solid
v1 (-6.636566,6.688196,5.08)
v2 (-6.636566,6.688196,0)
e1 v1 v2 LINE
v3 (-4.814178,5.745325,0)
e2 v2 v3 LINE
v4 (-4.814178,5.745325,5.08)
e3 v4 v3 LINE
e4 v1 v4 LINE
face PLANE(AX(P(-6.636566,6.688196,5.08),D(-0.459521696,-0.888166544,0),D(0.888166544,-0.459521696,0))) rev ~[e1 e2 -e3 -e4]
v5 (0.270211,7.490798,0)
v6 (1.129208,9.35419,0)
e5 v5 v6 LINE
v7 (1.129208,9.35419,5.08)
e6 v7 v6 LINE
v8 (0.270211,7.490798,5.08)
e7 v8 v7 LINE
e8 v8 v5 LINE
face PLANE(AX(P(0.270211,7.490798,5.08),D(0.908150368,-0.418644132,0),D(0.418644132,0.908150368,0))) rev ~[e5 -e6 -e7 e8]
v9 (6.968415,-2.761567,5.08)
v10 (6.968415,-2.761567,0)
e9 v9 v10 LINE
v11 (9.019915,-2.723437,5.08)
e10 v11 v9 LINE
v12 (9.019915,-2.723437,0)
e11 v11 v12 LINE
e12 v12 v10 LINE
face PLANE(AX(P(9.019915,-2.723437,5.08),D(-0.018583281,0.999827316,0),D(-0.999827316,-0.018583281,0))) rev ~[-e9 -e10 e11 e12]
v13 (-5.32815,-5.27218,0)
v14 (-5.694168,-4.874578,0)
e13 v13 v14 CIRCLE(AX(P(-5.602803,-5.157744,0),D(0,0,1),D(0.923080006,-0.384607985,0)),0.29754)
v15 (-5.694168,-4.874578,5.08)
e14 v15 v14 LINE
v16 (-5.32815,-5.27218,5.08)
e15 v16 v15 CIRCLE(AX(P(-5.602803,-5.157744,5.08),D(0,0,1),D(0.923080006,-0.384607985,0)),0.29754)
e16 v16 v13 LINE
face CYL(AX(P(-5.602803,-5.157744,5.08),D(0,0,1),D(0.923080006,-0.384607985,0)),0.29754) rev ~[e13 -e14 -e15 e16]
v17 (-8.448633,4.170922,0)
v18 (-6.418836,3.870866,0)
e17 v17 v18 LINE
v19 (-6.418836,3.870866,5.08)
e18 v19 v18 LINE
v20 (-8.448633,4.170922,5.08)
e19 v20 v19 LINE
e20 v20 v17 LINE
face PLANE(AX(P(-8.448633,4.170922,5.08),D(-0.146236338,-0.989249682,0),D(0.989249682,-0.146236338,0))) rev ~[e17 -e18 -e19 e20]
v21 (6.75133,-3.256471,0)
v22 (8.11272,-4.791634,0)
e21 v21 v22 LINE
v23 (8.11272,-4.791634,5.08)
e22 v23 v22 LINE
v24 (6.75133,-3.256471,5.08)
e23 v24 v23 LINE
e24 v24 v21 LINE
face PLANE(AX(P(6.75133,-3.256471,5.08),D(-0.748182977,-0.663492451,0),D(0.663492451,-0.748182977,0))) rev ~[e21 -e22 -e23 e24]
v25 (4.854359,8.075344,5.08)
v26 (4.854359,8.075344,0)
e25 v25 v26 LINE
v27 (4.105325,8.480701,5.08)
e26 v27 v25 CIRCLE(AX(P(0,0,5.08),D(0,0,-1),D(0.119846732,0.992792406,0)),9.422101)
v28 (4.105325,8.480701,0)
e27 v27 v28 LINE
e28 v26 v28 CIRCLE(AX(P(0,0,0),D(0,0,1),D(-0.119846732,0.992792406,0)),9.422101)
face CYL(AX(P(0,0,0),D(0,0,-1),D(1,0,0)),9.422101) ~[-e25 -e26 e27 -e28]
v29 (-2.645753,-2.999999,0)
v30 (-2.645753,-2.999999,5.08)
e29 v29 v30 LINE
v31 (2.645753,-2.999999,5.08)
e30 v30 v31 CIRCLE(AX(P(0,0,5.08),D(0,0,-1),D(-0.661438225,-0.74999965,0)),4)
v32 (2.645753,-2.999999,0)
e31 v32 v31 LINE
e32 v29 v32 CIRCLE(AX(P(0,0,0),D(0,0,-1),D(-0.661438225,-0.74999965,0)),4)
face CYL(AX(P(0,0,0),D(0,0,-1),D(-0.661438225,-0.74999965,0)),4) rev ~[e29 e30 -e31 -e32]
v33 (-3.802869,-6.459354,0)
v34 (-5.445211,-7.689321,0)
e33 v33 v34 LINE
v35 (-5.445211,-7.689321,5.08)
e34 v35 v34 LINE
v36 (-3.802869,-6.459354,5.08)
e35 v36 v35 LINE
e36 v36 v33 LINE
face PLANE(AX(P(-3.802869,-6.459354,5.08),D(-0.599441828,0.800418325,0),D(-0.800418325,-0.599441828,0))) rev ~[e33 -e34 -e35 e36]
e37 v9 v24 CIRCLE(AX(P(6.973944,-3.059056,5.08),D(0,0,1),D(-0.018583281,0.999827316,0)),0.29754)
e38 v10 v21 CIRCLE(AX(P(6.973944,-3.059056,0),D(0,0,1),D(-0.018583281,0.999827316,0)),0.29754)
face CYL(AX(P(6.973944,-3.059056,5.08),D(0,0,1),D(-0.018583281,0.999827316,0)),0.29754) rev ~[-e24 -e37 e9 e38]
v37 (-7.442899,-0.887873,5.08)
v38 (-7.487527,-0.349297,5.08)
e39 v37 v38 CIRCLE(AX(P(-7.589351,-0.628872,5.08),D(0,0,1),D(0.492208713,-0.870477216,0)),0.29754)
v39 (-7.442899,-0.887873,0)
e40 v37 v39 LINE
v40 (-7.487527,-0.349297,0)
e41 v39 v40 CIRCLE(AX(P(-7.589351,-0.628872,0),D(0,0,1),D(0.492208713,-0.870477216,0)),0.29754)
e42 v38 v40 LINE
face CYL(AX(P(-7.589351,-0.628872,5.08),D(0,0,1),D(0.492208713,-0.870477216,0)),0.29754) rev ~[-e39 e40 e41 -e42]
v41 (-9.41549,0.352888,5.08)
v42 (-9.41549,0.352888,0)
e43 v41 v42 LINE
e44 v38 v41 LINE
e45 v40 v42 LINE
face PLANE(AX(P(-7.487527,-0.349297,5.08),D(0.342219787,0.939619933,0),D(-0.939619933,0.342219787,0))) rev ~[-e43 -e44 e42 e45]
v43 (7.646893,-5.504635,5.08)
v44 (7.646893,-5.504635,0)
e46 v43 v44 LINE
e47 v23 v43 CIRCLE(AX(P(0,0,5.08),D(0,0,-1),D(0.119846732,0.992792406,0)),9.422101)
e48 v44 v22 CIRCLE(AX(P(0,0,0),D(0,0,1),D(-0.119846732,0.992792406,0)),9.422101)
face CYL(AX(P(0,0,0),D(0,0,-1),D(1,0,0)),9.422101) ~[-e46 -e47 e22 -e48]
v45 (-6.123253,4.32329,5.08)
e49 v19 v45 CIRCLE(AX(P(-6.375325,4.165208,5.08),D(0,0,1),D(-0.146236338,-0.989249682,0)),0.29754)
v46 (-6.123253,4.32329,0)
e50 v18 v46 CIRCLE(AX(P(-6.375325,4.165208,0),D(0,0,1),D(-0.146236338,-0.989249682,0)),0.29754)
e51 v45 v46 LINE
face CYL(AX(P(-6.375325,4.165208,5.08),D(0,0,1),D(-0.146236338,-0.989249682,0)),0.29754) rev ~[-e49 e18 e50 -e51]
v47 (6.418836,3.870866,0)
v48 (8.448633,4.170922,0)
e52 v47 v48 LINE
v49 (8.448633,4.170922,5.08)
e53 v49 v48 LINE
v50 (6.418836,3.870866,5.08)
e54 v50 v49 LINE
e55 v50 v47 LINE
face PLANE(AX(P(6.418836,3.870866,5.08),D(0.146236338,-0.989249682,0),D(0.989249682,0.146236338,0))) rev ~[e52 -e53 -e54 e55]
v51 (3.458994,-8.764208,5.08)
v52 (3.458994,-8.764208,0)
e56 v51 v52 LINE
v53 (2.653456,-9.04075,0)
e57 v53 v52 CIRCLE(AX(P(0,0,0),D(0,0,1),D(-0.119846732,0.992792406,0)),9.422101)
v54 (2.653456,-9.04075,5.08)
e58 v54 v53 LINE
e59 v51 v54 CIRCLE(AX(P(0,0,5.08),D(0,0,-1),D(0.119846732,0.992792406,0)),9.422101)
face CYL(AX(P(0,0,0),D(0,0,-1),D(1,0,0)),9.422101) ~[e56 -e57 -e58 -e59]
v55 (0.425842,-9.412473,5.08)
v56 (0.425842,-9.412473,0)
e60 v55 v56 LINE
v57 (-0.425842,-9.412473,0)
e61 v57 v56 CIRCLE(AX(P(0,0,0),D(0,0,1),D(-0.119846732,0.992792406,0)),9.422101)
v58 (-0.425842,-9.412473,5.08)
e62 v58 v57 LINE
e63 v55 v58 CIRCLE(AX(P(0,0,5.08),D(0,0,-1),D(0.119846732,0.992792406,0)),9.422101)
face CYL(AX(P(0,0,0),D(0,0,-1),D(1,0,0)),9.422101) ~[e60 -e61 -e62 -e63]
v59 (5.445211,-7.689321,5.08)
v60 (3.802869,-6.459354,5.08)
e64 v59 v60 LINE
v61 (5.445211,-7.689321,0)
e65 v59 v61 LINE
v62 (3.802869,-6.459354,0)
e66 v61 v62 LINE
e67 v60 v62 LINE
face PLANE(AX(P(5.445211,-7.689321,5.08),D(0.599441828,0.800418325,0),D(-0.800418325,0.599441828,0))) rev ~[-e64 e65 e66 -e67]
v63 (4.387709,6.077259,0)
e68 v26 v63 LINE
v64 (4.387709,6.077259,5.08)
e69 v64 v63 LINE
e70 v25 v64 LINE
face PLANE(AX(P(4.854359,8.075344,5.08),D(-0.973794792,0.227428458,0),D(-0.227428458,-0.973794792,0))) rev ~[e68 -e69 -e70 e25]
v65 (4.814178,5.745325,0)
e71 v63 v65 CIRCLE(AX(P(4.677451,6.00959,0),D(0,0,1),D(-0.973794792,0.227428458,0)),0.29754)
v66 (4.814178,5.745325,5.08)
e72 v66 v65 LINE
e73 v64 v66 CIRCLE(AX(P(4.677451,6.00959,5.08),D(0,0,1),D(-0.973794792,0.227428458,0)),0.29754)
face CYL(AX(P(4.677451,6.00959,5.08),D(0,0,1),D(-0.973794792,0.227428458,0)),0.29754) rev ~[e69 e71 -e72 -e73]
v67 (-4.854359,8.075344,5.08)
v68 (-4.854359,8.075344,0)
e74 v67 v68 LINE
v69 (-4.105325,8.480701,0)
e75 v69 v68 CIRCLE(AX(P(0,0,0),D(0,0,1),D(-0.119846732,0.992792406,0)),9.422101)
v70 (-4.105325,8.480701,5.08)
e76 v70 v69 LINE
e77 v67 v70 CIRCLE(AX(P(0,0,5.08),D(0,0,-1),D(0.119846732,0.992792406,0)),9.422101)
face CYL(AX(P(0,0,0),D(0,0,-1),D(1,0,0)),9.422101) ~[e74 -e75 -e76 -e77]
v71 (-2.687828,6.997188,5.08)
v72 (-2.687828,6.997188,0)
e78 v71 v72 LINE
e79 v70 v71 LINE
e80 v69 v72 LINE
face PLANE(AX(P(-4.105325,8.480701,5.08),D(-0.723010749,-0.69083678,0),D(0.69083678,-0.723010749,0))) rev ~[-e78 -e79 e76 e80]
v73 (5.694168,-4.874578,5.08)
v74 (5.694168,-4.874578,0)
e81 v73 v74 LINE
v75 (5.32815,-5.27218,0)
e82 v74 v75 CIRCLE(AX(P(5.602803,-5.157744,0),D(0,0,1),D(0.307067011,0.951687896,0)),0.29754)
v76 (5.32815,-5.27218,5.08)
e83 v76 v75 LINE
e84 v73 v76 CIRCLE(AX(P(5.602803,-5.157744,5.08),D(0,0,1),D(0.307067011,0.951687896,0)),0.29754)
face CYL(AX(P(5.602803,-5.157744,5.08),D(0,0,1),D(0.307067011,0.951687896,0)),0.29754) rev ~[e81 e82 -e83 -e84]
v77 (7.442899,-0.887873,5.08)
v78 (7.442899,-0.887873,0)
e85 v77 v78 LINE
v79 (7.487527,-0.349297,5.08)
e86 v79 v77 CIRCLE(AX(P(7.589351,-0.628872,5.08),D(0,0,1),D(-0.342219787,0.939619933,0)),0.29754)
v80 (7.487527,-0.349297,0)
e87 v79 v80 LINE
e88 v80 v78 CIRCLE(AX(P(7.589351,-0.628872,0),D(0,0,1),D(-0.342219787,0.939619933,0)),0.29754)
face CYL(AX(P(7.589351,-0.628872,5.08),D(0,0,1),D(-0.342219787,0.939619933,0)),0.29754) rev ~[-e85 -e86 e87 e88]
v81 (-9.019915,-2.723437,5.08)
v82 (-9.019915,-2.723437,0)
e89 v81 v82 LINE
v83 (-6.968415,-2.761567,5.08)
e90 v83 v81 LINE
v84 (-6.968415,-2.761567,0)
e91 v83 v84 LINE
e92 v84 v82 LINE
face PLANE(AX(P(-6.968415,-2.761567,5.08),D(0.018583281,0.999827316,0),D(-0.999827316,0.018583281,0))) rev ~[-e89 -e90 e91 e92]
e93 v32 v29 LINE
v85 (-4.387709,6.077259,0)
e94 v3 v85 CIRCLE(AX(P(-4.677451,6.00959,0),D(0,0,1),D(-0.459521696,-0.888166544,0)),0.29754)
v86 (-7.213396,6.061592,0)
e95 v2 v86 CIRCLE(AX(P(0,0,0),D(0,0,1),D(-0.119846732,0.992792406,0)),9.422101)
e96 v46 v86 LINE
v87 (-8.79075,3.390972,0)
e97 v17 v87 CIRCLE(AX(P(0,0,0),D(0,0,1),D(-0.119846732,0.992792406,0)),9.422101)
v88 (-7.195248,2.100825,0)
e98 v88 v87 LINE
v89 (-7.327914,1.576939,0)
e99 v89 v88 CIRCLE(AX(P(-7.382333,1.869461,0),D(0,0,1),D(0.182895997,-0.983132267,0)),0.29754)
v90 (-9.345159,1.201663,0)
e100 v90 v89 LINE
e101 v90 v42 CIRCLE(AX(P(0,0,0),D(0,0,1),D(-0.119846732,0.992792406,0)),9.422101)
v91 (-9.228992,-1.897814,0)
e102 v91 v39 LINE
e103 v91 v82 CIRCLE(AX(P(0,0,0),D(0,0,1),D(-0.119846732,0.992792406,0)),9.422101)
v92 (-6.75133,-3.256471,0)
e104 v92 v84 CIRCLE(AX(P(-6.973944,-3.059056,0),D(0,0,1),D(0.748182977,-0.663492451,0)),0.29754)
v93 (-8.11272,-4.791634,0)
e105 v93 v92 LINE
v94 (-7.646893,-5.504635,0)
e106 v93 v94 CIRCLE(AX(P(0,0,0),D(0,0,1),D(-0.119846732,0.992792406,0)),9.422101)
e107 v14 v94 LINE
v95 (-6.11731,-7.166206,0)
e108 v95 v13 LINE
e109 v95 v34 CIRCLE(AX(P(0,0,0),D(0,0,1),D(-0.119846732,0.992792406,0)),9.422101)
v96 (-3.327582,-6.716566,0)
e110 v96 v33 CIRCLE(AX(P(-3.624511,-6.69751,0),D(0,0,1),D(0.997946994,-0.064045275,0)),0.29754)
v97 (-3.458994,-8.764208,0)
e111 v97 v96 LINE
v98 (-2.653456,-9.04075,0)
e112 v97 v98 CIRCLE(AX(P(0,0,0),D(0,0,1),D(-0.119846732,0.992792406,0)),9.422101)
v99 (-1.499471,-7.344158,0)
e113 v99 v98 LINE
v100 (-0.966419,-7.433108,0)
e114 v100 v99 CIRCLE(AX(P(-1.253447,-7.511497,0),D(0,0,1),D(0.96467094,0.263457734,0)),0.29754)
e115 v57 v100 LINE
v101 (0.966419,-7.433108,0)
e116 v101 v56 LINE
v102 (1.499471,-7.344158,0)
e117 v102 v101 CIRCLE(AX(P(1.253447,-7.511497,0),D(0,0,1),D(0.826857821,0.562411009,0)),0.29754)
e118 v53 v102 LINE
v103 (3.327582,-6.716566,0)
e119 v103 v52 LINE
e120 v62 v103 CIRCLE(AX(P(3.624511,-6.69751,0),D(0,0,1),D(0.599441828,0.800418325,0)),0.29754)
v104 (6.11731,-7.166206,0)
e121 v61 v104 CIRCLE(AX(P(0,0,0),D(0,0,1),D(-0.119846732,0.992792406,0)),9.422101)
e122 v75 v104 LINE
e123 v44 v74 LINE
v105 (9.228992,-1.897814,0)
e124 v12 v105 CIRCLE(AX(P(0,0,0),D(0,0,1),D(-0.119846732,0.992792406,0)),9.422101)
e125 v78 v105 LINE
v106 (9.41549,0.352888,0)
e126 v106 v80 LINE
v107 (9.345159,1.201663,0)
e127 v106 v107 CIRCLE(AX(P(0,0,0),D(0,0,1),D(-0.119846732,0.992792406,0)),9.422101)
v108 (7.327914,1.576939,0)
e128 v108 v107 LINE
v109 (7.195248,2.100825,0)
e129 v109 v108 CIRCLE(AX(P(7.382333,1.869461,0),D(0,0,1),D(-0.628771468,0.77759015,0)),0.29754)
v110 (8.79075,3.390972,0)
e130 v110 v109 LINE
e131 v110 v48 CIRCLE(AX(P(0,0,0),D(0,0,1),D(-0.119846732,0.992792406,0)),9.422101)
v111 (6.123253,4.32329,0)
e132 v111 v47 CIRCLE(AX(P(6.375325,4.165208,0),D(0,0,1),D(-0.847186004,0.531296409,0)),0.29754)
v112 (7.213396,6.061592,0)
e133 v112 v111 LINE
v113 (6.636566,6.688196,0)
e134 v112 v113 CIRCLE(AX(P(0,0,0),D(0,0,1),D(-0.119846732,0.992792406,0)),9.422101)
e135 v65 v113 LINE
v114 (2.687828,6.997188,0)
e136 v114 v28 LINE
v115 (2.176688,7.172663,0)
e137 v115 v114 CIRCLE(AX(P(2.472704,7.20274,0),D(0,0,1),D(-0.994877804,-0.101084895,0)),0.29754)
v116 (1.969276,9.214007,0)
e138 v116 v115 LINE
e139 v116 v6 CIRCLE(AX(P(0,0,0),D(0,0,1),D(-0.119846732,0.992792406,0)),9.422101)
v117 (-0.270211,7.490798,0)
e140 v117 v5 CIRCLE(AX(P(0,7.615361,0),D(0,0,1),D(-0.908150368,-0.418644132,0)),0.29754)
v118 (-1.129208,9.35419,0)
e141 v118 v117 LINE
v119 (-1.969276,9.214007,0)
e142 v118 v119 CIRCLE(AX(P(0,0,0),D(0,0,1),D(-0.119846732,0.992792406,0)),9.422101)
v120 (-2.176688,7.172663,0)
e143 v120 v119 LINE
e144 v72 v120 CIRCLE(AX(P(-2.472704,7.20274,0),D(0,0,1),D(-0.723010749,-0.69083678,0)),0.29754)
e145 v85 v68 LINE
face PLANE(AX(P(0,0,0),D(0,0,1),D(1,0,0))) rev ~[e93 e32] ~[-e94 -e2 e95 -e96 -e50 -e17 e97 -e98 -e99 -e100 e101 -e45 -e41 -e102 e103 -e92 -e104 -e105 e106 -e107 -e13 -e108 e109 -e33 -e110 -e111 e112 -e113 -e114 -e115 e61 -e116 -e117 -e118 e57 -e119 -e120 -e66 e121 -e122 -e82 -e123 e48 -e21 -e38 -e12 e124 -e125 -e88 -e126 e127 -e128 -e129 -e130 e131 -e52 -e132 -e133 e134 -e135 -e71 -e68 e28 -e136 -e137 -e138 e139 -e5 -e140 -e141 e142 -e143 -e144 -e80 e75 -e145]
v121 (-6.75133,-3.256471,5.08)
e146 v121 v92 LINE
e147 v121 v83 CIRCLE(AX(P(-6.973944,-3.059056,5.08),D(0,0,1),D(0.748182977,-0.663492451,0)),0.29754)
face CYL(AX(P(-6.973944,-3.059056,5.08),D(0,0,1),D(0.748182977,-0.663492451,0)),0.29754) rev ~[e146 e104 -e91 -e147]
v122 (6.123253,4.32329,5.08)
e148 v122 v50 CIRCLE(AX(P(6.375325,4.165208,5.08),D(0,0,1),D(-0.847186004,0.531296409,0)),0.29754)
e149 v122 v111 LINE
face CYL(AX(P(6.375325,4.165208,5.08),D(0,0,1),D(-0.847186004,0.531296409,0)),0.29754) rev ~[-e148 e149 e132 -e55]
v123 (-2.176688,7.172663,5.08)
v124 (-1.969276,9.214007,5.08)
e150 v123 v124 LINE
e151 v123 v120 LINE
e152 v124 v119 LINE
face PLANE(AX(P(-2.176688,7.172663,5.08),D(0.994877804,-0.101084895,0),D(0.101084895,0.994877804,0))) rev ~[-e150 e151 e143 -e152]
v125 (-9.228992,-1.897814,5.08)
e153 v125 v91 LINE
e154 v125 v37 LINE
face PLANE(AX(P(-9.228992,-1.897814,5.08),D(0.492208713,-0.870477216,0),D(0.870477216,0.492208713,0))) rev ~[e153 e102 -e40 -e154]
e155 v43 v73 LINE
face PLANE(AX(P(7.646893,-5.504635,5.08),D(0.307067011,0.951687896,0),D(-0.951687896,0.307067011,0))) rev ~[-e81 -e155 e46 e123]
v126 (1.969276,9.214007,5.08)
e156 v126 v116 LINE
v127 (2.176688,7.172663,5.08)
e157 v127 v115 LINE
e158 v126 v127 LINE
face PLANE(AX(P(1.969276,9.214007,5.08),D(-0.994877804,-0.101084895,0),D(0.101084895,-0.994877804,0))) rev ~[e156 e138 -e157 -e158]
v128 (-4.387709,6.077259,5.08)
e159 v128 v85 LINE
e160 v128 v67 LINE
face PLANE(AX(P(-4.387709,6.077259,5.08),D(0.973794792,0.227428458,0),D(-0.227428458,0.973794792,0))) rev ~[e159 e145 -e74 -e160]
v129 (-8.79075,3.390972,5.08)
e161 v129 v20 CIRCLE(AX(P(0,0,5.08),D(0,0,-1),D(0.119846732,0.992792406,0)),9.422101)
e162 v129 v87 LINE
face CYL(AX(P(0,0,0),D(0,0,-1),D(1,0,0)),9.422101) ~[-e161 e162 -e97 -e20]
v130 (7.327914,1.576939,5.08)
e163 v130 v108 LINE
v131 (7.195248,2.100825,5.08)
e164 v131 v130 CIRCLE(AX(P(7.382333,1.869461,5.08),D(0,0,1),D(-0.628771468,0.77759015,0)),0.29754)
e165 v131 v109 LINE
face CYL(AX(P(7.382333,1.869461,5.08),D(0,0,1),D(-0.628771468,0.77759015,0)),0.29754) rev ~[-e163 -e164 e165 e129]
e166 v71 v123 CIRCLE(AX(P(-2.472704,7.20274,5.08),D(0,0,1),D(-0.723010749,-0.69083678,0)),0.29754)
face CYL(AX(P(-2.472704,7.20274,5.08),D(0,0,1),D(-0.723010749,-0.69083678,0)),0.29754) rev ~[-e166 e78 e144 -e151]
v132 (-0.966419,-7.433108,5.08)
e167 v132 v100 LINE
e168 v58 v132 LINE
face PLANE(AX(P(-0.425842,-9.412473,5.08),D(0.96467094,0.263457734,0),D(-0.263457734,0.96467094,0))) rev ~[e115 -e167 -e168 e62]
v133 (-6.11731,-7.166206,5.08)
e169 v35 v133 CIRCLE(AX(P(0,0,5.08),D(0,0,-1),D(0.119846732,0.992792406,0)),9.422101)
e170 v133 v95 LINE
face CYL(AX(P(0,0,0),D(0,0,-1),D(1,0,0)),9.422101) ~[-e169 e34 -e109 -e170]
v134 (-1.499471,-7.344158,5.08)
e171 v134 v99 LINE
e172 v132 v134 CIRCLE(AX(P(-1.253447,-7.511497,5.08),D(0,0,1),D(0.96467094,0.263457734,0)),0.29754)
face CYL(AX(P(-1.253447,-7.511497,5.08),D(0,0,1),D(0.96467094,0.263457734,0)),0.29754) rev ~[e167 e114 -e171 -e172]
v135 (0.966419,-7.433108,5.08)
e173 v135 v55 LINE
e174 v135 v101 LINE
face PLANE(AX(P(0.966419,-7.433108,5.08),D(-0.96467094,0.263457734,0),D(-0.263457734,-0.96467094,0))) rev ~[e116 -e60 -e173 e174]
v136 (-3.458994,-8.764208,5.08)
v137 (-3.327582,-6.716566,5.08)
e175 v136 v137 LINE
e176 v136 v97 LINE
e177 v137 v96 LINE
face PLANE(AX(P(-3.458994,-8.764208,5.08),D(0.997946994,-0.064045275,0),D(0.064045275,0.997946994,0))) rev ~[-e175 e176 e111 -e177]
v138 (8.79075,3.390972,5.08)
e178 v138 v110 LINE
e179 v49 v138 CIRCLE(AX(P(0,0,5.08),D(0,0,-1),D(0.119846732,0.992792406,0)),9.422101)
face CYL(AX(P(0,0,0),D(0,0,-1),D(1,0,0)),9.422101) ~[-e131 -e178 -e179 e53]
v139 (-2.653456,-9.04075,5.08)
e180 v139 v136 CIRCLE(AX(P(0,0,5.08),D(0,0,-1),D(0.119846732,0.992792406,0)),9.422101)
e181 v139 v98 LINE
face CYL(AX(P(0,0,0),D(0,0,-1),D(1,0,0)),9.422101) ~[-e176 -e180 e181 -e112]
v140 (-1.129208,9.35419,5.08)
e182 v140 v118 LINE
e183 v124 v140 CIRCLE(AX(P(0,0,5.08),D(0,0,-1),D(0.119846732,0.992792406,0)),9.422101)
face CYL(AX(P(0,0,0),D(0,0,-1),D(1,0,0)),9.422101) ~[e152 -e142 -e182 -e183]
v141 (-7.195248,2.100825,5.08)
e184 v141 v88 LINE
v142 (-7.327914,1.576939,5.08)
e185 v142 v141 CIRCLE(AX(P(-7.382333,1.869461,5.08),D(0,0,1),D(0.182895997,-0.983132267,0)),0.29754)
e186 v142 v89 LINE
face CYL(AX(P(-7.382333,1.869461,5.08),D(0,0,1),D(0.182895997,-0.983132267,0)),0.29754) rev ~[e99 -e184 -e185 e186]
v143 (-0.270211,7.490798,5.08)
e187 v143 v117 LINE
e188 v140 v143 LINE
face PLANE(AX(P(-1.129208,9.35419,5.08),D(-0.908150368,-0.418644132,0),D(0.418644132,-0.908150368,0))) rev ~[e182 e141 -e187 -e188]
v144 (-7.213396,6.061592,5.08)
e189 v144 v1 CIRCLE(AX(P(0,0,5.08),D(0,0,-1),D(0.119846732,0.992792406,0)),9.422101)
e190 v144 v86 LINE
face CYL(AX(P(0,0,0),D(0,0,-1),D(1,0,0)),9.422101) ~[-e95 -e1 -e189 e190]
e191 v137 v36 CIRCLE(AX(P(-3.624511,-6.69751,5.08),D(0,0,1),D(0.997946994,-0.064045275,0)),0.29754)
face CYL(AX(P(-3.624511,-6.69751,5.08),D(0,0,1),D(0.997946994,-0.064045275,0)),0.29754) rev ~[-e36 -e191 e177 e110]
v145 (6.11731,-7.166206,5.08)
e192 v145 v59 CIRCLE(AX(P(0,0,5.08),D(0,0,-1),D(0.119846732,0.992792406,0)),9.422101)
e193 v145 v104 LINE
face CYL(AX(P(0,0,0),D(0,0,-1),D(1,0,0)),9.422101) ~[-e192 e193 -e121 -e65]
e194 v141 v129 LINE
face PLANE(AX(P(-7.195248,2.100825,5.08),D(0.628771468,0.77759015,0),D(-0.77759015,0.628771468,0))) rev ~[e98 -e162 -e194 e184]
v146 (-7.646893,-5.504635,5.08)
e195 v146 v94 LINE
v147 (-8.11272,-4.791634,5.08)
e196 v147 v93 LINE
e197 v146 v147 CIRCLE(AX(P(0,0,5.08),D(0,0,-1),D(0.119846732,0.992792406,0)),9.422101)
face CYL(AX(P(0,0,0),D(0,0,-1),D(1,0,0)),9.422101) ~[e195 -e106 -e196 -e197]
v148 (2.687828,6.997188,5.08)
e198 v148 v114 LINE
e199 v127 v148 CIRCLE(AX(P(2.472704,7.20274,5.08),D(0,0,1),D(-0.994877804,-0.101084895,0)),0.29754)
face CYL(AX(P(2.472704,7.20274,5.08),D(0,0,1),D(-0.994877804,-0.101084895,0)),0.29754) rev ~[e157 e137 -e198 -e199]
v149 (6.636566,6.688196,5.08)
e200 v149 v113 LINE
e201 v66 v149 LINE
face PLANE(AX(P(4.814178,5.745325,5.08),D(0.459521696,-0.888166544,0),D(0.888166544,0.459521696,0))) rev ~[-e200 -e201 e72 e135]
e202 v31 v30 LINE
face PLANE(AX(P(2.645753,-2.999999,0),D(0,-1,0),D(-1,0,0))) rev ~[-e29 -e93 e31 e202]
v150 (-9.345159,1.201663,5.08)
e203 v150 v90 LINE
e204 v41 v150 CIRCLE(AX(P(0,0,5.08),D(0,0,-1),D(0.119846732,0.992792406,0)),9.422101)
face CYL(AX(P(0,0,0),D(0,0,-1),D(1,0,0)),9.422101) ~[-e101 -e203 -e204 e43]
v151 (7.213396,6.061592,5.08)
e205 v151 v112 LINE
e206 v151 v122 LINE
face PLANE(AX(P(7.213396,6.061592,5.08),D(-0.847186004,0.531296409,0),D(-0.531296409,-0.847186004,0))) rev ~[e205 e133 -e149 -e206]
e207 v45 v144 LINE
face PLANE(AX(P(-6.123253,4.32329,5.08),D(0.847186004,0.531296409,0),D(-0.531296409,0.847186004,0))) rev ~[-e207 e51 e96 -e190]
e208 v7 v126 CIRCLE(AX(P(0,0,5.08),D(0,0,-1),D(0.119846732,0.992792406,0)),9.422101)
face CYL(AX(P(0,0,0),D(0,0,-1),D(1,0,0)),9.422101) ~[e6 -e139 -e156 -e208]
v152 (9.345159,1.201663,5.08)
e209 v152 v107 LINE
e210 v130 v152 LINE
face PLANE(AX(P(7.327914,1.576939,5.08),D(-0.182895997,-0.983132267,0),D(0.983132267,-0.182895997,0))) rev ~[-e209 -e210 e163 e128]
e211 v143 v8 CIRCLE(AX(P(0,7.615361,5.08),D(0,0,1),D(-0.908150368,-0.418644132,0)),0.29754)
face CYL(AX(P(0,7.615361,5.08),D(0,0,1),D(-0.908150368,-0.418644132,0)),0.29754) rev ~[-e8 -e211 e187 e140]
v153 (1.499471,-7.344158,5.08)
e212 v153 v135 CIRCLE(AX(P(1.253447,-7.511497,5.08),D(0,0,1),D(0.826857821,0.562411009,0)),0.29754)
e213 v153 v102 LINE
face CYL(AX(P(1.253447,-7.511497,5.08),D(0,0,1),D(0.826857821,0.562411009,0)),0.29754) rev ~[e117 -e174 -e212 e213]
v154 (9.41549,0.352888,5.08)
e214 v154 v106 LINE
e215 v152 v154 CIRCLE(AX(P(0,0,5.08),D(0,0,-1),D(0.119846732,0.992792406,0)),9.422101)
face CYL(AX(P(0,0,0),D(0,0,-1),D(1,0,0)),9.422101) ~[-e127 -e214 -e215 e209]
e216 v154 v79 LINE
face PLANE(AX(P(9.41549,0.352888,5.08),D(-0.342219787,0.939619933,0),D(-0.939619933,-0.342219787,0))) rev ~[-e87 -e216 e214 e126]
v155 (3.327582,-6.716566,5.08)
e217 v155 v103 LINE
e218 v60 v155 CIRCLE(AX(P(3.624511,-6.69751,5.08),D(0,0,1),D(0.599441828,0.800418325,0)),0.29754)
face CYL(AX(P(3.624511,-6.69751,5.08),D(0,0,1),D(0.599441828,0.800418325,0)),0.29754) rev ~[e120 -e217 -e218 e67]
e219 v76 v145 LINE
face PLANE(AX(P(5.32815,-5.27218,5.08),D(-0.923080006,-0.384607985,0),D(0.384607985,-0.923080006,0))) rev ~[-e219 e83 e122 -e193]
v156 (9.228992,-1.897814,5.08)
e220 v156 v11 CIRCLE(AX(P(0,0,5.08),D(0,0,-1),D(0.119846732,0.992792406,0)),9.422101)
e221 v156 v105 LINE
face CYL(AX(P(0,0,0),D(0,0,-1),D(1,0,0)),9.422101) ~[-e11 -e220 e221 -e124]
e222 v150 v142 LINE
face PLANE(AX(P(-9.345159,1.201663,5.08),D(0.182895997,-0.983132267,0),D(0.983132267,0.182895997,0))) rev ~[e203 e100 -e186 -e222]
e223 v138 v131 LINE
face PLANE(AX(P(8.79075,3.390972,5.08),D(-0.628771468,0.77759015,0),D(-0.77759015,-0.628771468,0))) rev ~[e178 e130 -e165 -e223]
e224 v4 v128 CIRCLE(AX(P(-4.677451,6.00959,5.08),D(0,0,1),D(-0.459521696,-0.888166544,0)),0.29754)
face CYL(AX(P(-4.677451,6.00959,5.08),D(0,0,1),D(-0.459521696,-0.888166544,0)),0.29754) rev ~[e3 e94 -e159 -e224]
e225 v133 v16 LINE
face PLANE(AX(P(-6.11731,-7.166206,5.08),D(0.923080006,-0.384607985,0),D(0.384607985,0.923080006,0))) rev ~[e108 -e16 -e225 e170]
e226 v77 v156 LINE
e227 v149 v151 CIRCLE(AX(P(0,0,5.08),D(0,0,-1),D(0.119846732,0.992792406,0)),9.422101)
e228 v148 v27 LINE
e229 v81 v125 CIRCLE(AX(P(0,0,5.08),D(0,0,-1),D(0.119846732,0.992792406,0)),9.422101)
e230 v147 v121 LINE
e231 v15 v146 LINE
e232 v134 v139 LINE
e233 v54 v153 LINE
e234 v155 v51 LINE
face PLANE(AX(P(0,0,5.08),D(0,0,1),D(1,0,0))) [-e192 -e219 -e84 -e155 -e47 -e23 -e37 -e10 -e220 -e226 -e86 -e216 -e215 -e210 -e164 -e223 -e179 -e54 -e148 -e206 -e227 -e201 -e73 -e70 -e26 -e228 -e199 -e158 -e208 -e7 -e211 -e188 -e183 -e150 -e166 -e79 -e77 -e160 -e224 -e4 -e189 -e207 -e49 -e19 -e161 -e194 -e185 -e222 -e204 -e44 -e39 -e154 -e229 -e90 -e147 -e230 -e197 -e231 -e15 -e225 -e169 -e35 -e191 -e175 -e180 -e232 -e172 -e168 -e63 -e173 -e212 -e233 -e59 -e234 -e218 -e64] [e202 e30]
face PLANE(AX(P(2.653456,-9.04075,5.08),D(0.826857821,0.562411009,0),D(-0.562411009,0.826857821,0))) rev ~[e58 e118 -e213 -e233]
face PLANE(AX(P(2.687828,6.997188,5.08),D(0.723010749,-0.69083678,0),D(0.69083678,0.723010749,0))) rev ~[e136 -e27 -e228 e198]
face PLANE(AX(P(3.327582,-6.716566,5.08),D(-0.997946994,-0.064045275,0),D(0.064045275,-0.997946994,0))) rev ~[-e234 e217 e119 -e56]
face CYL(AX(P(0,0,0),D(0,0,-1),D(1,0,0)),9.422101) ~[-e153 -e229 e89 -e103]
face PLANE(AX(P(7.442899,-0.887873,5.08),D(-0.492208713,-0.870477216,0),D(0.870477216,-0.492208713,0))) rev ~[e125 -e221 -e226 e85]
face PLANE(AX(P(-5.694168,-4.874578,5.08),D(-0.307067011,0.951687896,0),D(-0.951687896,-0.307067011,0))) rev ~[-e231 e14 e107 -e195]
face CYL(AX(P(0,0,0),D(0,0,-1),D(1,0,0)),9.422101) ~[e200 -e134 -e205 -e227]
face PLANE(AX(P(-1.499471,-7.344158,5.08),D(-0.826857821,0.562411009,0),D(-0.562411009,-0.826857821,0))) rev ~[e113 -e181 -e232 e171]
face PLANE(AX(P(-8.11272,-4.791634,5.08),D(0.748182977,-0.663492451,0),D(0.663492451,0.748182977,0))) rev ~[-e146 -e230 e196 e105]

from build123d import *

# Parameters (mm, degrees)
F0_R            = 9.4221007419
F1_DEPTH        = 5.08
F3_DEPTH        = 5.08
F3_COPIES_COUNT = 19


# Not quite as in the source:
# - a pattern or mirror of a feature is missing from the dataset's text; its kind, count and spacing are read off the source's solid
# - a feature names something its author has since deleted; it is built from what else it names


with BuildPart() as f1:
    # F0 (on Top) → F1 (new body)
    with BuildSketch(Plane.XY):
        Circle(F0_R)
        with BuildLine():
            ThreePointArc((-2.6457529, -2.9999985987), (0, 4), (2.6457529, -2.9999985987))
            Line((2.6457529, -2.9999985987), (-2.6457529, -2.9999985987))
        make_face(mode=Mode.SUBTRACT)
    extrude(amount=F1_DEPTH)

    # F2 (on face) → F3 (cut, through all)
    with BuildSketch(Plane.XY.offset(5.08)):
        with BuildLine():
            Line((0.2702110818, 7.4907975301), (1.1292079793, 9.3541900628))
            ThreePointArc((1.1292079793, 9.3541900628), (0, 9.4221007419), (-1.1292079793, 9.3541900628))
            Line((-1.1292079793, 9.3541900628), (-0.2702110818, 7.4907975301))
            ThreePointArc((-0.2702110818, 7.4907975301), (0, 7.3178208914), (0.2702110818, 7.4907975301))
        make_face()
    f3 = extrude(amount=-F3_DEPTH, mode=Mode.SUBTRACT)

    # F3_copies: F3 ×19 about axis
    f3_copies_axis = Axis((0, 0, 0), (0, 0, 1))
    for i in range(1, F3_COPIES_COUNT):
        add(f3.rotate(f3_copies_axis, i * 360 / F3_COPIES_COUNT), mode=Mode.SUBTRACT)


solid = f1.part
